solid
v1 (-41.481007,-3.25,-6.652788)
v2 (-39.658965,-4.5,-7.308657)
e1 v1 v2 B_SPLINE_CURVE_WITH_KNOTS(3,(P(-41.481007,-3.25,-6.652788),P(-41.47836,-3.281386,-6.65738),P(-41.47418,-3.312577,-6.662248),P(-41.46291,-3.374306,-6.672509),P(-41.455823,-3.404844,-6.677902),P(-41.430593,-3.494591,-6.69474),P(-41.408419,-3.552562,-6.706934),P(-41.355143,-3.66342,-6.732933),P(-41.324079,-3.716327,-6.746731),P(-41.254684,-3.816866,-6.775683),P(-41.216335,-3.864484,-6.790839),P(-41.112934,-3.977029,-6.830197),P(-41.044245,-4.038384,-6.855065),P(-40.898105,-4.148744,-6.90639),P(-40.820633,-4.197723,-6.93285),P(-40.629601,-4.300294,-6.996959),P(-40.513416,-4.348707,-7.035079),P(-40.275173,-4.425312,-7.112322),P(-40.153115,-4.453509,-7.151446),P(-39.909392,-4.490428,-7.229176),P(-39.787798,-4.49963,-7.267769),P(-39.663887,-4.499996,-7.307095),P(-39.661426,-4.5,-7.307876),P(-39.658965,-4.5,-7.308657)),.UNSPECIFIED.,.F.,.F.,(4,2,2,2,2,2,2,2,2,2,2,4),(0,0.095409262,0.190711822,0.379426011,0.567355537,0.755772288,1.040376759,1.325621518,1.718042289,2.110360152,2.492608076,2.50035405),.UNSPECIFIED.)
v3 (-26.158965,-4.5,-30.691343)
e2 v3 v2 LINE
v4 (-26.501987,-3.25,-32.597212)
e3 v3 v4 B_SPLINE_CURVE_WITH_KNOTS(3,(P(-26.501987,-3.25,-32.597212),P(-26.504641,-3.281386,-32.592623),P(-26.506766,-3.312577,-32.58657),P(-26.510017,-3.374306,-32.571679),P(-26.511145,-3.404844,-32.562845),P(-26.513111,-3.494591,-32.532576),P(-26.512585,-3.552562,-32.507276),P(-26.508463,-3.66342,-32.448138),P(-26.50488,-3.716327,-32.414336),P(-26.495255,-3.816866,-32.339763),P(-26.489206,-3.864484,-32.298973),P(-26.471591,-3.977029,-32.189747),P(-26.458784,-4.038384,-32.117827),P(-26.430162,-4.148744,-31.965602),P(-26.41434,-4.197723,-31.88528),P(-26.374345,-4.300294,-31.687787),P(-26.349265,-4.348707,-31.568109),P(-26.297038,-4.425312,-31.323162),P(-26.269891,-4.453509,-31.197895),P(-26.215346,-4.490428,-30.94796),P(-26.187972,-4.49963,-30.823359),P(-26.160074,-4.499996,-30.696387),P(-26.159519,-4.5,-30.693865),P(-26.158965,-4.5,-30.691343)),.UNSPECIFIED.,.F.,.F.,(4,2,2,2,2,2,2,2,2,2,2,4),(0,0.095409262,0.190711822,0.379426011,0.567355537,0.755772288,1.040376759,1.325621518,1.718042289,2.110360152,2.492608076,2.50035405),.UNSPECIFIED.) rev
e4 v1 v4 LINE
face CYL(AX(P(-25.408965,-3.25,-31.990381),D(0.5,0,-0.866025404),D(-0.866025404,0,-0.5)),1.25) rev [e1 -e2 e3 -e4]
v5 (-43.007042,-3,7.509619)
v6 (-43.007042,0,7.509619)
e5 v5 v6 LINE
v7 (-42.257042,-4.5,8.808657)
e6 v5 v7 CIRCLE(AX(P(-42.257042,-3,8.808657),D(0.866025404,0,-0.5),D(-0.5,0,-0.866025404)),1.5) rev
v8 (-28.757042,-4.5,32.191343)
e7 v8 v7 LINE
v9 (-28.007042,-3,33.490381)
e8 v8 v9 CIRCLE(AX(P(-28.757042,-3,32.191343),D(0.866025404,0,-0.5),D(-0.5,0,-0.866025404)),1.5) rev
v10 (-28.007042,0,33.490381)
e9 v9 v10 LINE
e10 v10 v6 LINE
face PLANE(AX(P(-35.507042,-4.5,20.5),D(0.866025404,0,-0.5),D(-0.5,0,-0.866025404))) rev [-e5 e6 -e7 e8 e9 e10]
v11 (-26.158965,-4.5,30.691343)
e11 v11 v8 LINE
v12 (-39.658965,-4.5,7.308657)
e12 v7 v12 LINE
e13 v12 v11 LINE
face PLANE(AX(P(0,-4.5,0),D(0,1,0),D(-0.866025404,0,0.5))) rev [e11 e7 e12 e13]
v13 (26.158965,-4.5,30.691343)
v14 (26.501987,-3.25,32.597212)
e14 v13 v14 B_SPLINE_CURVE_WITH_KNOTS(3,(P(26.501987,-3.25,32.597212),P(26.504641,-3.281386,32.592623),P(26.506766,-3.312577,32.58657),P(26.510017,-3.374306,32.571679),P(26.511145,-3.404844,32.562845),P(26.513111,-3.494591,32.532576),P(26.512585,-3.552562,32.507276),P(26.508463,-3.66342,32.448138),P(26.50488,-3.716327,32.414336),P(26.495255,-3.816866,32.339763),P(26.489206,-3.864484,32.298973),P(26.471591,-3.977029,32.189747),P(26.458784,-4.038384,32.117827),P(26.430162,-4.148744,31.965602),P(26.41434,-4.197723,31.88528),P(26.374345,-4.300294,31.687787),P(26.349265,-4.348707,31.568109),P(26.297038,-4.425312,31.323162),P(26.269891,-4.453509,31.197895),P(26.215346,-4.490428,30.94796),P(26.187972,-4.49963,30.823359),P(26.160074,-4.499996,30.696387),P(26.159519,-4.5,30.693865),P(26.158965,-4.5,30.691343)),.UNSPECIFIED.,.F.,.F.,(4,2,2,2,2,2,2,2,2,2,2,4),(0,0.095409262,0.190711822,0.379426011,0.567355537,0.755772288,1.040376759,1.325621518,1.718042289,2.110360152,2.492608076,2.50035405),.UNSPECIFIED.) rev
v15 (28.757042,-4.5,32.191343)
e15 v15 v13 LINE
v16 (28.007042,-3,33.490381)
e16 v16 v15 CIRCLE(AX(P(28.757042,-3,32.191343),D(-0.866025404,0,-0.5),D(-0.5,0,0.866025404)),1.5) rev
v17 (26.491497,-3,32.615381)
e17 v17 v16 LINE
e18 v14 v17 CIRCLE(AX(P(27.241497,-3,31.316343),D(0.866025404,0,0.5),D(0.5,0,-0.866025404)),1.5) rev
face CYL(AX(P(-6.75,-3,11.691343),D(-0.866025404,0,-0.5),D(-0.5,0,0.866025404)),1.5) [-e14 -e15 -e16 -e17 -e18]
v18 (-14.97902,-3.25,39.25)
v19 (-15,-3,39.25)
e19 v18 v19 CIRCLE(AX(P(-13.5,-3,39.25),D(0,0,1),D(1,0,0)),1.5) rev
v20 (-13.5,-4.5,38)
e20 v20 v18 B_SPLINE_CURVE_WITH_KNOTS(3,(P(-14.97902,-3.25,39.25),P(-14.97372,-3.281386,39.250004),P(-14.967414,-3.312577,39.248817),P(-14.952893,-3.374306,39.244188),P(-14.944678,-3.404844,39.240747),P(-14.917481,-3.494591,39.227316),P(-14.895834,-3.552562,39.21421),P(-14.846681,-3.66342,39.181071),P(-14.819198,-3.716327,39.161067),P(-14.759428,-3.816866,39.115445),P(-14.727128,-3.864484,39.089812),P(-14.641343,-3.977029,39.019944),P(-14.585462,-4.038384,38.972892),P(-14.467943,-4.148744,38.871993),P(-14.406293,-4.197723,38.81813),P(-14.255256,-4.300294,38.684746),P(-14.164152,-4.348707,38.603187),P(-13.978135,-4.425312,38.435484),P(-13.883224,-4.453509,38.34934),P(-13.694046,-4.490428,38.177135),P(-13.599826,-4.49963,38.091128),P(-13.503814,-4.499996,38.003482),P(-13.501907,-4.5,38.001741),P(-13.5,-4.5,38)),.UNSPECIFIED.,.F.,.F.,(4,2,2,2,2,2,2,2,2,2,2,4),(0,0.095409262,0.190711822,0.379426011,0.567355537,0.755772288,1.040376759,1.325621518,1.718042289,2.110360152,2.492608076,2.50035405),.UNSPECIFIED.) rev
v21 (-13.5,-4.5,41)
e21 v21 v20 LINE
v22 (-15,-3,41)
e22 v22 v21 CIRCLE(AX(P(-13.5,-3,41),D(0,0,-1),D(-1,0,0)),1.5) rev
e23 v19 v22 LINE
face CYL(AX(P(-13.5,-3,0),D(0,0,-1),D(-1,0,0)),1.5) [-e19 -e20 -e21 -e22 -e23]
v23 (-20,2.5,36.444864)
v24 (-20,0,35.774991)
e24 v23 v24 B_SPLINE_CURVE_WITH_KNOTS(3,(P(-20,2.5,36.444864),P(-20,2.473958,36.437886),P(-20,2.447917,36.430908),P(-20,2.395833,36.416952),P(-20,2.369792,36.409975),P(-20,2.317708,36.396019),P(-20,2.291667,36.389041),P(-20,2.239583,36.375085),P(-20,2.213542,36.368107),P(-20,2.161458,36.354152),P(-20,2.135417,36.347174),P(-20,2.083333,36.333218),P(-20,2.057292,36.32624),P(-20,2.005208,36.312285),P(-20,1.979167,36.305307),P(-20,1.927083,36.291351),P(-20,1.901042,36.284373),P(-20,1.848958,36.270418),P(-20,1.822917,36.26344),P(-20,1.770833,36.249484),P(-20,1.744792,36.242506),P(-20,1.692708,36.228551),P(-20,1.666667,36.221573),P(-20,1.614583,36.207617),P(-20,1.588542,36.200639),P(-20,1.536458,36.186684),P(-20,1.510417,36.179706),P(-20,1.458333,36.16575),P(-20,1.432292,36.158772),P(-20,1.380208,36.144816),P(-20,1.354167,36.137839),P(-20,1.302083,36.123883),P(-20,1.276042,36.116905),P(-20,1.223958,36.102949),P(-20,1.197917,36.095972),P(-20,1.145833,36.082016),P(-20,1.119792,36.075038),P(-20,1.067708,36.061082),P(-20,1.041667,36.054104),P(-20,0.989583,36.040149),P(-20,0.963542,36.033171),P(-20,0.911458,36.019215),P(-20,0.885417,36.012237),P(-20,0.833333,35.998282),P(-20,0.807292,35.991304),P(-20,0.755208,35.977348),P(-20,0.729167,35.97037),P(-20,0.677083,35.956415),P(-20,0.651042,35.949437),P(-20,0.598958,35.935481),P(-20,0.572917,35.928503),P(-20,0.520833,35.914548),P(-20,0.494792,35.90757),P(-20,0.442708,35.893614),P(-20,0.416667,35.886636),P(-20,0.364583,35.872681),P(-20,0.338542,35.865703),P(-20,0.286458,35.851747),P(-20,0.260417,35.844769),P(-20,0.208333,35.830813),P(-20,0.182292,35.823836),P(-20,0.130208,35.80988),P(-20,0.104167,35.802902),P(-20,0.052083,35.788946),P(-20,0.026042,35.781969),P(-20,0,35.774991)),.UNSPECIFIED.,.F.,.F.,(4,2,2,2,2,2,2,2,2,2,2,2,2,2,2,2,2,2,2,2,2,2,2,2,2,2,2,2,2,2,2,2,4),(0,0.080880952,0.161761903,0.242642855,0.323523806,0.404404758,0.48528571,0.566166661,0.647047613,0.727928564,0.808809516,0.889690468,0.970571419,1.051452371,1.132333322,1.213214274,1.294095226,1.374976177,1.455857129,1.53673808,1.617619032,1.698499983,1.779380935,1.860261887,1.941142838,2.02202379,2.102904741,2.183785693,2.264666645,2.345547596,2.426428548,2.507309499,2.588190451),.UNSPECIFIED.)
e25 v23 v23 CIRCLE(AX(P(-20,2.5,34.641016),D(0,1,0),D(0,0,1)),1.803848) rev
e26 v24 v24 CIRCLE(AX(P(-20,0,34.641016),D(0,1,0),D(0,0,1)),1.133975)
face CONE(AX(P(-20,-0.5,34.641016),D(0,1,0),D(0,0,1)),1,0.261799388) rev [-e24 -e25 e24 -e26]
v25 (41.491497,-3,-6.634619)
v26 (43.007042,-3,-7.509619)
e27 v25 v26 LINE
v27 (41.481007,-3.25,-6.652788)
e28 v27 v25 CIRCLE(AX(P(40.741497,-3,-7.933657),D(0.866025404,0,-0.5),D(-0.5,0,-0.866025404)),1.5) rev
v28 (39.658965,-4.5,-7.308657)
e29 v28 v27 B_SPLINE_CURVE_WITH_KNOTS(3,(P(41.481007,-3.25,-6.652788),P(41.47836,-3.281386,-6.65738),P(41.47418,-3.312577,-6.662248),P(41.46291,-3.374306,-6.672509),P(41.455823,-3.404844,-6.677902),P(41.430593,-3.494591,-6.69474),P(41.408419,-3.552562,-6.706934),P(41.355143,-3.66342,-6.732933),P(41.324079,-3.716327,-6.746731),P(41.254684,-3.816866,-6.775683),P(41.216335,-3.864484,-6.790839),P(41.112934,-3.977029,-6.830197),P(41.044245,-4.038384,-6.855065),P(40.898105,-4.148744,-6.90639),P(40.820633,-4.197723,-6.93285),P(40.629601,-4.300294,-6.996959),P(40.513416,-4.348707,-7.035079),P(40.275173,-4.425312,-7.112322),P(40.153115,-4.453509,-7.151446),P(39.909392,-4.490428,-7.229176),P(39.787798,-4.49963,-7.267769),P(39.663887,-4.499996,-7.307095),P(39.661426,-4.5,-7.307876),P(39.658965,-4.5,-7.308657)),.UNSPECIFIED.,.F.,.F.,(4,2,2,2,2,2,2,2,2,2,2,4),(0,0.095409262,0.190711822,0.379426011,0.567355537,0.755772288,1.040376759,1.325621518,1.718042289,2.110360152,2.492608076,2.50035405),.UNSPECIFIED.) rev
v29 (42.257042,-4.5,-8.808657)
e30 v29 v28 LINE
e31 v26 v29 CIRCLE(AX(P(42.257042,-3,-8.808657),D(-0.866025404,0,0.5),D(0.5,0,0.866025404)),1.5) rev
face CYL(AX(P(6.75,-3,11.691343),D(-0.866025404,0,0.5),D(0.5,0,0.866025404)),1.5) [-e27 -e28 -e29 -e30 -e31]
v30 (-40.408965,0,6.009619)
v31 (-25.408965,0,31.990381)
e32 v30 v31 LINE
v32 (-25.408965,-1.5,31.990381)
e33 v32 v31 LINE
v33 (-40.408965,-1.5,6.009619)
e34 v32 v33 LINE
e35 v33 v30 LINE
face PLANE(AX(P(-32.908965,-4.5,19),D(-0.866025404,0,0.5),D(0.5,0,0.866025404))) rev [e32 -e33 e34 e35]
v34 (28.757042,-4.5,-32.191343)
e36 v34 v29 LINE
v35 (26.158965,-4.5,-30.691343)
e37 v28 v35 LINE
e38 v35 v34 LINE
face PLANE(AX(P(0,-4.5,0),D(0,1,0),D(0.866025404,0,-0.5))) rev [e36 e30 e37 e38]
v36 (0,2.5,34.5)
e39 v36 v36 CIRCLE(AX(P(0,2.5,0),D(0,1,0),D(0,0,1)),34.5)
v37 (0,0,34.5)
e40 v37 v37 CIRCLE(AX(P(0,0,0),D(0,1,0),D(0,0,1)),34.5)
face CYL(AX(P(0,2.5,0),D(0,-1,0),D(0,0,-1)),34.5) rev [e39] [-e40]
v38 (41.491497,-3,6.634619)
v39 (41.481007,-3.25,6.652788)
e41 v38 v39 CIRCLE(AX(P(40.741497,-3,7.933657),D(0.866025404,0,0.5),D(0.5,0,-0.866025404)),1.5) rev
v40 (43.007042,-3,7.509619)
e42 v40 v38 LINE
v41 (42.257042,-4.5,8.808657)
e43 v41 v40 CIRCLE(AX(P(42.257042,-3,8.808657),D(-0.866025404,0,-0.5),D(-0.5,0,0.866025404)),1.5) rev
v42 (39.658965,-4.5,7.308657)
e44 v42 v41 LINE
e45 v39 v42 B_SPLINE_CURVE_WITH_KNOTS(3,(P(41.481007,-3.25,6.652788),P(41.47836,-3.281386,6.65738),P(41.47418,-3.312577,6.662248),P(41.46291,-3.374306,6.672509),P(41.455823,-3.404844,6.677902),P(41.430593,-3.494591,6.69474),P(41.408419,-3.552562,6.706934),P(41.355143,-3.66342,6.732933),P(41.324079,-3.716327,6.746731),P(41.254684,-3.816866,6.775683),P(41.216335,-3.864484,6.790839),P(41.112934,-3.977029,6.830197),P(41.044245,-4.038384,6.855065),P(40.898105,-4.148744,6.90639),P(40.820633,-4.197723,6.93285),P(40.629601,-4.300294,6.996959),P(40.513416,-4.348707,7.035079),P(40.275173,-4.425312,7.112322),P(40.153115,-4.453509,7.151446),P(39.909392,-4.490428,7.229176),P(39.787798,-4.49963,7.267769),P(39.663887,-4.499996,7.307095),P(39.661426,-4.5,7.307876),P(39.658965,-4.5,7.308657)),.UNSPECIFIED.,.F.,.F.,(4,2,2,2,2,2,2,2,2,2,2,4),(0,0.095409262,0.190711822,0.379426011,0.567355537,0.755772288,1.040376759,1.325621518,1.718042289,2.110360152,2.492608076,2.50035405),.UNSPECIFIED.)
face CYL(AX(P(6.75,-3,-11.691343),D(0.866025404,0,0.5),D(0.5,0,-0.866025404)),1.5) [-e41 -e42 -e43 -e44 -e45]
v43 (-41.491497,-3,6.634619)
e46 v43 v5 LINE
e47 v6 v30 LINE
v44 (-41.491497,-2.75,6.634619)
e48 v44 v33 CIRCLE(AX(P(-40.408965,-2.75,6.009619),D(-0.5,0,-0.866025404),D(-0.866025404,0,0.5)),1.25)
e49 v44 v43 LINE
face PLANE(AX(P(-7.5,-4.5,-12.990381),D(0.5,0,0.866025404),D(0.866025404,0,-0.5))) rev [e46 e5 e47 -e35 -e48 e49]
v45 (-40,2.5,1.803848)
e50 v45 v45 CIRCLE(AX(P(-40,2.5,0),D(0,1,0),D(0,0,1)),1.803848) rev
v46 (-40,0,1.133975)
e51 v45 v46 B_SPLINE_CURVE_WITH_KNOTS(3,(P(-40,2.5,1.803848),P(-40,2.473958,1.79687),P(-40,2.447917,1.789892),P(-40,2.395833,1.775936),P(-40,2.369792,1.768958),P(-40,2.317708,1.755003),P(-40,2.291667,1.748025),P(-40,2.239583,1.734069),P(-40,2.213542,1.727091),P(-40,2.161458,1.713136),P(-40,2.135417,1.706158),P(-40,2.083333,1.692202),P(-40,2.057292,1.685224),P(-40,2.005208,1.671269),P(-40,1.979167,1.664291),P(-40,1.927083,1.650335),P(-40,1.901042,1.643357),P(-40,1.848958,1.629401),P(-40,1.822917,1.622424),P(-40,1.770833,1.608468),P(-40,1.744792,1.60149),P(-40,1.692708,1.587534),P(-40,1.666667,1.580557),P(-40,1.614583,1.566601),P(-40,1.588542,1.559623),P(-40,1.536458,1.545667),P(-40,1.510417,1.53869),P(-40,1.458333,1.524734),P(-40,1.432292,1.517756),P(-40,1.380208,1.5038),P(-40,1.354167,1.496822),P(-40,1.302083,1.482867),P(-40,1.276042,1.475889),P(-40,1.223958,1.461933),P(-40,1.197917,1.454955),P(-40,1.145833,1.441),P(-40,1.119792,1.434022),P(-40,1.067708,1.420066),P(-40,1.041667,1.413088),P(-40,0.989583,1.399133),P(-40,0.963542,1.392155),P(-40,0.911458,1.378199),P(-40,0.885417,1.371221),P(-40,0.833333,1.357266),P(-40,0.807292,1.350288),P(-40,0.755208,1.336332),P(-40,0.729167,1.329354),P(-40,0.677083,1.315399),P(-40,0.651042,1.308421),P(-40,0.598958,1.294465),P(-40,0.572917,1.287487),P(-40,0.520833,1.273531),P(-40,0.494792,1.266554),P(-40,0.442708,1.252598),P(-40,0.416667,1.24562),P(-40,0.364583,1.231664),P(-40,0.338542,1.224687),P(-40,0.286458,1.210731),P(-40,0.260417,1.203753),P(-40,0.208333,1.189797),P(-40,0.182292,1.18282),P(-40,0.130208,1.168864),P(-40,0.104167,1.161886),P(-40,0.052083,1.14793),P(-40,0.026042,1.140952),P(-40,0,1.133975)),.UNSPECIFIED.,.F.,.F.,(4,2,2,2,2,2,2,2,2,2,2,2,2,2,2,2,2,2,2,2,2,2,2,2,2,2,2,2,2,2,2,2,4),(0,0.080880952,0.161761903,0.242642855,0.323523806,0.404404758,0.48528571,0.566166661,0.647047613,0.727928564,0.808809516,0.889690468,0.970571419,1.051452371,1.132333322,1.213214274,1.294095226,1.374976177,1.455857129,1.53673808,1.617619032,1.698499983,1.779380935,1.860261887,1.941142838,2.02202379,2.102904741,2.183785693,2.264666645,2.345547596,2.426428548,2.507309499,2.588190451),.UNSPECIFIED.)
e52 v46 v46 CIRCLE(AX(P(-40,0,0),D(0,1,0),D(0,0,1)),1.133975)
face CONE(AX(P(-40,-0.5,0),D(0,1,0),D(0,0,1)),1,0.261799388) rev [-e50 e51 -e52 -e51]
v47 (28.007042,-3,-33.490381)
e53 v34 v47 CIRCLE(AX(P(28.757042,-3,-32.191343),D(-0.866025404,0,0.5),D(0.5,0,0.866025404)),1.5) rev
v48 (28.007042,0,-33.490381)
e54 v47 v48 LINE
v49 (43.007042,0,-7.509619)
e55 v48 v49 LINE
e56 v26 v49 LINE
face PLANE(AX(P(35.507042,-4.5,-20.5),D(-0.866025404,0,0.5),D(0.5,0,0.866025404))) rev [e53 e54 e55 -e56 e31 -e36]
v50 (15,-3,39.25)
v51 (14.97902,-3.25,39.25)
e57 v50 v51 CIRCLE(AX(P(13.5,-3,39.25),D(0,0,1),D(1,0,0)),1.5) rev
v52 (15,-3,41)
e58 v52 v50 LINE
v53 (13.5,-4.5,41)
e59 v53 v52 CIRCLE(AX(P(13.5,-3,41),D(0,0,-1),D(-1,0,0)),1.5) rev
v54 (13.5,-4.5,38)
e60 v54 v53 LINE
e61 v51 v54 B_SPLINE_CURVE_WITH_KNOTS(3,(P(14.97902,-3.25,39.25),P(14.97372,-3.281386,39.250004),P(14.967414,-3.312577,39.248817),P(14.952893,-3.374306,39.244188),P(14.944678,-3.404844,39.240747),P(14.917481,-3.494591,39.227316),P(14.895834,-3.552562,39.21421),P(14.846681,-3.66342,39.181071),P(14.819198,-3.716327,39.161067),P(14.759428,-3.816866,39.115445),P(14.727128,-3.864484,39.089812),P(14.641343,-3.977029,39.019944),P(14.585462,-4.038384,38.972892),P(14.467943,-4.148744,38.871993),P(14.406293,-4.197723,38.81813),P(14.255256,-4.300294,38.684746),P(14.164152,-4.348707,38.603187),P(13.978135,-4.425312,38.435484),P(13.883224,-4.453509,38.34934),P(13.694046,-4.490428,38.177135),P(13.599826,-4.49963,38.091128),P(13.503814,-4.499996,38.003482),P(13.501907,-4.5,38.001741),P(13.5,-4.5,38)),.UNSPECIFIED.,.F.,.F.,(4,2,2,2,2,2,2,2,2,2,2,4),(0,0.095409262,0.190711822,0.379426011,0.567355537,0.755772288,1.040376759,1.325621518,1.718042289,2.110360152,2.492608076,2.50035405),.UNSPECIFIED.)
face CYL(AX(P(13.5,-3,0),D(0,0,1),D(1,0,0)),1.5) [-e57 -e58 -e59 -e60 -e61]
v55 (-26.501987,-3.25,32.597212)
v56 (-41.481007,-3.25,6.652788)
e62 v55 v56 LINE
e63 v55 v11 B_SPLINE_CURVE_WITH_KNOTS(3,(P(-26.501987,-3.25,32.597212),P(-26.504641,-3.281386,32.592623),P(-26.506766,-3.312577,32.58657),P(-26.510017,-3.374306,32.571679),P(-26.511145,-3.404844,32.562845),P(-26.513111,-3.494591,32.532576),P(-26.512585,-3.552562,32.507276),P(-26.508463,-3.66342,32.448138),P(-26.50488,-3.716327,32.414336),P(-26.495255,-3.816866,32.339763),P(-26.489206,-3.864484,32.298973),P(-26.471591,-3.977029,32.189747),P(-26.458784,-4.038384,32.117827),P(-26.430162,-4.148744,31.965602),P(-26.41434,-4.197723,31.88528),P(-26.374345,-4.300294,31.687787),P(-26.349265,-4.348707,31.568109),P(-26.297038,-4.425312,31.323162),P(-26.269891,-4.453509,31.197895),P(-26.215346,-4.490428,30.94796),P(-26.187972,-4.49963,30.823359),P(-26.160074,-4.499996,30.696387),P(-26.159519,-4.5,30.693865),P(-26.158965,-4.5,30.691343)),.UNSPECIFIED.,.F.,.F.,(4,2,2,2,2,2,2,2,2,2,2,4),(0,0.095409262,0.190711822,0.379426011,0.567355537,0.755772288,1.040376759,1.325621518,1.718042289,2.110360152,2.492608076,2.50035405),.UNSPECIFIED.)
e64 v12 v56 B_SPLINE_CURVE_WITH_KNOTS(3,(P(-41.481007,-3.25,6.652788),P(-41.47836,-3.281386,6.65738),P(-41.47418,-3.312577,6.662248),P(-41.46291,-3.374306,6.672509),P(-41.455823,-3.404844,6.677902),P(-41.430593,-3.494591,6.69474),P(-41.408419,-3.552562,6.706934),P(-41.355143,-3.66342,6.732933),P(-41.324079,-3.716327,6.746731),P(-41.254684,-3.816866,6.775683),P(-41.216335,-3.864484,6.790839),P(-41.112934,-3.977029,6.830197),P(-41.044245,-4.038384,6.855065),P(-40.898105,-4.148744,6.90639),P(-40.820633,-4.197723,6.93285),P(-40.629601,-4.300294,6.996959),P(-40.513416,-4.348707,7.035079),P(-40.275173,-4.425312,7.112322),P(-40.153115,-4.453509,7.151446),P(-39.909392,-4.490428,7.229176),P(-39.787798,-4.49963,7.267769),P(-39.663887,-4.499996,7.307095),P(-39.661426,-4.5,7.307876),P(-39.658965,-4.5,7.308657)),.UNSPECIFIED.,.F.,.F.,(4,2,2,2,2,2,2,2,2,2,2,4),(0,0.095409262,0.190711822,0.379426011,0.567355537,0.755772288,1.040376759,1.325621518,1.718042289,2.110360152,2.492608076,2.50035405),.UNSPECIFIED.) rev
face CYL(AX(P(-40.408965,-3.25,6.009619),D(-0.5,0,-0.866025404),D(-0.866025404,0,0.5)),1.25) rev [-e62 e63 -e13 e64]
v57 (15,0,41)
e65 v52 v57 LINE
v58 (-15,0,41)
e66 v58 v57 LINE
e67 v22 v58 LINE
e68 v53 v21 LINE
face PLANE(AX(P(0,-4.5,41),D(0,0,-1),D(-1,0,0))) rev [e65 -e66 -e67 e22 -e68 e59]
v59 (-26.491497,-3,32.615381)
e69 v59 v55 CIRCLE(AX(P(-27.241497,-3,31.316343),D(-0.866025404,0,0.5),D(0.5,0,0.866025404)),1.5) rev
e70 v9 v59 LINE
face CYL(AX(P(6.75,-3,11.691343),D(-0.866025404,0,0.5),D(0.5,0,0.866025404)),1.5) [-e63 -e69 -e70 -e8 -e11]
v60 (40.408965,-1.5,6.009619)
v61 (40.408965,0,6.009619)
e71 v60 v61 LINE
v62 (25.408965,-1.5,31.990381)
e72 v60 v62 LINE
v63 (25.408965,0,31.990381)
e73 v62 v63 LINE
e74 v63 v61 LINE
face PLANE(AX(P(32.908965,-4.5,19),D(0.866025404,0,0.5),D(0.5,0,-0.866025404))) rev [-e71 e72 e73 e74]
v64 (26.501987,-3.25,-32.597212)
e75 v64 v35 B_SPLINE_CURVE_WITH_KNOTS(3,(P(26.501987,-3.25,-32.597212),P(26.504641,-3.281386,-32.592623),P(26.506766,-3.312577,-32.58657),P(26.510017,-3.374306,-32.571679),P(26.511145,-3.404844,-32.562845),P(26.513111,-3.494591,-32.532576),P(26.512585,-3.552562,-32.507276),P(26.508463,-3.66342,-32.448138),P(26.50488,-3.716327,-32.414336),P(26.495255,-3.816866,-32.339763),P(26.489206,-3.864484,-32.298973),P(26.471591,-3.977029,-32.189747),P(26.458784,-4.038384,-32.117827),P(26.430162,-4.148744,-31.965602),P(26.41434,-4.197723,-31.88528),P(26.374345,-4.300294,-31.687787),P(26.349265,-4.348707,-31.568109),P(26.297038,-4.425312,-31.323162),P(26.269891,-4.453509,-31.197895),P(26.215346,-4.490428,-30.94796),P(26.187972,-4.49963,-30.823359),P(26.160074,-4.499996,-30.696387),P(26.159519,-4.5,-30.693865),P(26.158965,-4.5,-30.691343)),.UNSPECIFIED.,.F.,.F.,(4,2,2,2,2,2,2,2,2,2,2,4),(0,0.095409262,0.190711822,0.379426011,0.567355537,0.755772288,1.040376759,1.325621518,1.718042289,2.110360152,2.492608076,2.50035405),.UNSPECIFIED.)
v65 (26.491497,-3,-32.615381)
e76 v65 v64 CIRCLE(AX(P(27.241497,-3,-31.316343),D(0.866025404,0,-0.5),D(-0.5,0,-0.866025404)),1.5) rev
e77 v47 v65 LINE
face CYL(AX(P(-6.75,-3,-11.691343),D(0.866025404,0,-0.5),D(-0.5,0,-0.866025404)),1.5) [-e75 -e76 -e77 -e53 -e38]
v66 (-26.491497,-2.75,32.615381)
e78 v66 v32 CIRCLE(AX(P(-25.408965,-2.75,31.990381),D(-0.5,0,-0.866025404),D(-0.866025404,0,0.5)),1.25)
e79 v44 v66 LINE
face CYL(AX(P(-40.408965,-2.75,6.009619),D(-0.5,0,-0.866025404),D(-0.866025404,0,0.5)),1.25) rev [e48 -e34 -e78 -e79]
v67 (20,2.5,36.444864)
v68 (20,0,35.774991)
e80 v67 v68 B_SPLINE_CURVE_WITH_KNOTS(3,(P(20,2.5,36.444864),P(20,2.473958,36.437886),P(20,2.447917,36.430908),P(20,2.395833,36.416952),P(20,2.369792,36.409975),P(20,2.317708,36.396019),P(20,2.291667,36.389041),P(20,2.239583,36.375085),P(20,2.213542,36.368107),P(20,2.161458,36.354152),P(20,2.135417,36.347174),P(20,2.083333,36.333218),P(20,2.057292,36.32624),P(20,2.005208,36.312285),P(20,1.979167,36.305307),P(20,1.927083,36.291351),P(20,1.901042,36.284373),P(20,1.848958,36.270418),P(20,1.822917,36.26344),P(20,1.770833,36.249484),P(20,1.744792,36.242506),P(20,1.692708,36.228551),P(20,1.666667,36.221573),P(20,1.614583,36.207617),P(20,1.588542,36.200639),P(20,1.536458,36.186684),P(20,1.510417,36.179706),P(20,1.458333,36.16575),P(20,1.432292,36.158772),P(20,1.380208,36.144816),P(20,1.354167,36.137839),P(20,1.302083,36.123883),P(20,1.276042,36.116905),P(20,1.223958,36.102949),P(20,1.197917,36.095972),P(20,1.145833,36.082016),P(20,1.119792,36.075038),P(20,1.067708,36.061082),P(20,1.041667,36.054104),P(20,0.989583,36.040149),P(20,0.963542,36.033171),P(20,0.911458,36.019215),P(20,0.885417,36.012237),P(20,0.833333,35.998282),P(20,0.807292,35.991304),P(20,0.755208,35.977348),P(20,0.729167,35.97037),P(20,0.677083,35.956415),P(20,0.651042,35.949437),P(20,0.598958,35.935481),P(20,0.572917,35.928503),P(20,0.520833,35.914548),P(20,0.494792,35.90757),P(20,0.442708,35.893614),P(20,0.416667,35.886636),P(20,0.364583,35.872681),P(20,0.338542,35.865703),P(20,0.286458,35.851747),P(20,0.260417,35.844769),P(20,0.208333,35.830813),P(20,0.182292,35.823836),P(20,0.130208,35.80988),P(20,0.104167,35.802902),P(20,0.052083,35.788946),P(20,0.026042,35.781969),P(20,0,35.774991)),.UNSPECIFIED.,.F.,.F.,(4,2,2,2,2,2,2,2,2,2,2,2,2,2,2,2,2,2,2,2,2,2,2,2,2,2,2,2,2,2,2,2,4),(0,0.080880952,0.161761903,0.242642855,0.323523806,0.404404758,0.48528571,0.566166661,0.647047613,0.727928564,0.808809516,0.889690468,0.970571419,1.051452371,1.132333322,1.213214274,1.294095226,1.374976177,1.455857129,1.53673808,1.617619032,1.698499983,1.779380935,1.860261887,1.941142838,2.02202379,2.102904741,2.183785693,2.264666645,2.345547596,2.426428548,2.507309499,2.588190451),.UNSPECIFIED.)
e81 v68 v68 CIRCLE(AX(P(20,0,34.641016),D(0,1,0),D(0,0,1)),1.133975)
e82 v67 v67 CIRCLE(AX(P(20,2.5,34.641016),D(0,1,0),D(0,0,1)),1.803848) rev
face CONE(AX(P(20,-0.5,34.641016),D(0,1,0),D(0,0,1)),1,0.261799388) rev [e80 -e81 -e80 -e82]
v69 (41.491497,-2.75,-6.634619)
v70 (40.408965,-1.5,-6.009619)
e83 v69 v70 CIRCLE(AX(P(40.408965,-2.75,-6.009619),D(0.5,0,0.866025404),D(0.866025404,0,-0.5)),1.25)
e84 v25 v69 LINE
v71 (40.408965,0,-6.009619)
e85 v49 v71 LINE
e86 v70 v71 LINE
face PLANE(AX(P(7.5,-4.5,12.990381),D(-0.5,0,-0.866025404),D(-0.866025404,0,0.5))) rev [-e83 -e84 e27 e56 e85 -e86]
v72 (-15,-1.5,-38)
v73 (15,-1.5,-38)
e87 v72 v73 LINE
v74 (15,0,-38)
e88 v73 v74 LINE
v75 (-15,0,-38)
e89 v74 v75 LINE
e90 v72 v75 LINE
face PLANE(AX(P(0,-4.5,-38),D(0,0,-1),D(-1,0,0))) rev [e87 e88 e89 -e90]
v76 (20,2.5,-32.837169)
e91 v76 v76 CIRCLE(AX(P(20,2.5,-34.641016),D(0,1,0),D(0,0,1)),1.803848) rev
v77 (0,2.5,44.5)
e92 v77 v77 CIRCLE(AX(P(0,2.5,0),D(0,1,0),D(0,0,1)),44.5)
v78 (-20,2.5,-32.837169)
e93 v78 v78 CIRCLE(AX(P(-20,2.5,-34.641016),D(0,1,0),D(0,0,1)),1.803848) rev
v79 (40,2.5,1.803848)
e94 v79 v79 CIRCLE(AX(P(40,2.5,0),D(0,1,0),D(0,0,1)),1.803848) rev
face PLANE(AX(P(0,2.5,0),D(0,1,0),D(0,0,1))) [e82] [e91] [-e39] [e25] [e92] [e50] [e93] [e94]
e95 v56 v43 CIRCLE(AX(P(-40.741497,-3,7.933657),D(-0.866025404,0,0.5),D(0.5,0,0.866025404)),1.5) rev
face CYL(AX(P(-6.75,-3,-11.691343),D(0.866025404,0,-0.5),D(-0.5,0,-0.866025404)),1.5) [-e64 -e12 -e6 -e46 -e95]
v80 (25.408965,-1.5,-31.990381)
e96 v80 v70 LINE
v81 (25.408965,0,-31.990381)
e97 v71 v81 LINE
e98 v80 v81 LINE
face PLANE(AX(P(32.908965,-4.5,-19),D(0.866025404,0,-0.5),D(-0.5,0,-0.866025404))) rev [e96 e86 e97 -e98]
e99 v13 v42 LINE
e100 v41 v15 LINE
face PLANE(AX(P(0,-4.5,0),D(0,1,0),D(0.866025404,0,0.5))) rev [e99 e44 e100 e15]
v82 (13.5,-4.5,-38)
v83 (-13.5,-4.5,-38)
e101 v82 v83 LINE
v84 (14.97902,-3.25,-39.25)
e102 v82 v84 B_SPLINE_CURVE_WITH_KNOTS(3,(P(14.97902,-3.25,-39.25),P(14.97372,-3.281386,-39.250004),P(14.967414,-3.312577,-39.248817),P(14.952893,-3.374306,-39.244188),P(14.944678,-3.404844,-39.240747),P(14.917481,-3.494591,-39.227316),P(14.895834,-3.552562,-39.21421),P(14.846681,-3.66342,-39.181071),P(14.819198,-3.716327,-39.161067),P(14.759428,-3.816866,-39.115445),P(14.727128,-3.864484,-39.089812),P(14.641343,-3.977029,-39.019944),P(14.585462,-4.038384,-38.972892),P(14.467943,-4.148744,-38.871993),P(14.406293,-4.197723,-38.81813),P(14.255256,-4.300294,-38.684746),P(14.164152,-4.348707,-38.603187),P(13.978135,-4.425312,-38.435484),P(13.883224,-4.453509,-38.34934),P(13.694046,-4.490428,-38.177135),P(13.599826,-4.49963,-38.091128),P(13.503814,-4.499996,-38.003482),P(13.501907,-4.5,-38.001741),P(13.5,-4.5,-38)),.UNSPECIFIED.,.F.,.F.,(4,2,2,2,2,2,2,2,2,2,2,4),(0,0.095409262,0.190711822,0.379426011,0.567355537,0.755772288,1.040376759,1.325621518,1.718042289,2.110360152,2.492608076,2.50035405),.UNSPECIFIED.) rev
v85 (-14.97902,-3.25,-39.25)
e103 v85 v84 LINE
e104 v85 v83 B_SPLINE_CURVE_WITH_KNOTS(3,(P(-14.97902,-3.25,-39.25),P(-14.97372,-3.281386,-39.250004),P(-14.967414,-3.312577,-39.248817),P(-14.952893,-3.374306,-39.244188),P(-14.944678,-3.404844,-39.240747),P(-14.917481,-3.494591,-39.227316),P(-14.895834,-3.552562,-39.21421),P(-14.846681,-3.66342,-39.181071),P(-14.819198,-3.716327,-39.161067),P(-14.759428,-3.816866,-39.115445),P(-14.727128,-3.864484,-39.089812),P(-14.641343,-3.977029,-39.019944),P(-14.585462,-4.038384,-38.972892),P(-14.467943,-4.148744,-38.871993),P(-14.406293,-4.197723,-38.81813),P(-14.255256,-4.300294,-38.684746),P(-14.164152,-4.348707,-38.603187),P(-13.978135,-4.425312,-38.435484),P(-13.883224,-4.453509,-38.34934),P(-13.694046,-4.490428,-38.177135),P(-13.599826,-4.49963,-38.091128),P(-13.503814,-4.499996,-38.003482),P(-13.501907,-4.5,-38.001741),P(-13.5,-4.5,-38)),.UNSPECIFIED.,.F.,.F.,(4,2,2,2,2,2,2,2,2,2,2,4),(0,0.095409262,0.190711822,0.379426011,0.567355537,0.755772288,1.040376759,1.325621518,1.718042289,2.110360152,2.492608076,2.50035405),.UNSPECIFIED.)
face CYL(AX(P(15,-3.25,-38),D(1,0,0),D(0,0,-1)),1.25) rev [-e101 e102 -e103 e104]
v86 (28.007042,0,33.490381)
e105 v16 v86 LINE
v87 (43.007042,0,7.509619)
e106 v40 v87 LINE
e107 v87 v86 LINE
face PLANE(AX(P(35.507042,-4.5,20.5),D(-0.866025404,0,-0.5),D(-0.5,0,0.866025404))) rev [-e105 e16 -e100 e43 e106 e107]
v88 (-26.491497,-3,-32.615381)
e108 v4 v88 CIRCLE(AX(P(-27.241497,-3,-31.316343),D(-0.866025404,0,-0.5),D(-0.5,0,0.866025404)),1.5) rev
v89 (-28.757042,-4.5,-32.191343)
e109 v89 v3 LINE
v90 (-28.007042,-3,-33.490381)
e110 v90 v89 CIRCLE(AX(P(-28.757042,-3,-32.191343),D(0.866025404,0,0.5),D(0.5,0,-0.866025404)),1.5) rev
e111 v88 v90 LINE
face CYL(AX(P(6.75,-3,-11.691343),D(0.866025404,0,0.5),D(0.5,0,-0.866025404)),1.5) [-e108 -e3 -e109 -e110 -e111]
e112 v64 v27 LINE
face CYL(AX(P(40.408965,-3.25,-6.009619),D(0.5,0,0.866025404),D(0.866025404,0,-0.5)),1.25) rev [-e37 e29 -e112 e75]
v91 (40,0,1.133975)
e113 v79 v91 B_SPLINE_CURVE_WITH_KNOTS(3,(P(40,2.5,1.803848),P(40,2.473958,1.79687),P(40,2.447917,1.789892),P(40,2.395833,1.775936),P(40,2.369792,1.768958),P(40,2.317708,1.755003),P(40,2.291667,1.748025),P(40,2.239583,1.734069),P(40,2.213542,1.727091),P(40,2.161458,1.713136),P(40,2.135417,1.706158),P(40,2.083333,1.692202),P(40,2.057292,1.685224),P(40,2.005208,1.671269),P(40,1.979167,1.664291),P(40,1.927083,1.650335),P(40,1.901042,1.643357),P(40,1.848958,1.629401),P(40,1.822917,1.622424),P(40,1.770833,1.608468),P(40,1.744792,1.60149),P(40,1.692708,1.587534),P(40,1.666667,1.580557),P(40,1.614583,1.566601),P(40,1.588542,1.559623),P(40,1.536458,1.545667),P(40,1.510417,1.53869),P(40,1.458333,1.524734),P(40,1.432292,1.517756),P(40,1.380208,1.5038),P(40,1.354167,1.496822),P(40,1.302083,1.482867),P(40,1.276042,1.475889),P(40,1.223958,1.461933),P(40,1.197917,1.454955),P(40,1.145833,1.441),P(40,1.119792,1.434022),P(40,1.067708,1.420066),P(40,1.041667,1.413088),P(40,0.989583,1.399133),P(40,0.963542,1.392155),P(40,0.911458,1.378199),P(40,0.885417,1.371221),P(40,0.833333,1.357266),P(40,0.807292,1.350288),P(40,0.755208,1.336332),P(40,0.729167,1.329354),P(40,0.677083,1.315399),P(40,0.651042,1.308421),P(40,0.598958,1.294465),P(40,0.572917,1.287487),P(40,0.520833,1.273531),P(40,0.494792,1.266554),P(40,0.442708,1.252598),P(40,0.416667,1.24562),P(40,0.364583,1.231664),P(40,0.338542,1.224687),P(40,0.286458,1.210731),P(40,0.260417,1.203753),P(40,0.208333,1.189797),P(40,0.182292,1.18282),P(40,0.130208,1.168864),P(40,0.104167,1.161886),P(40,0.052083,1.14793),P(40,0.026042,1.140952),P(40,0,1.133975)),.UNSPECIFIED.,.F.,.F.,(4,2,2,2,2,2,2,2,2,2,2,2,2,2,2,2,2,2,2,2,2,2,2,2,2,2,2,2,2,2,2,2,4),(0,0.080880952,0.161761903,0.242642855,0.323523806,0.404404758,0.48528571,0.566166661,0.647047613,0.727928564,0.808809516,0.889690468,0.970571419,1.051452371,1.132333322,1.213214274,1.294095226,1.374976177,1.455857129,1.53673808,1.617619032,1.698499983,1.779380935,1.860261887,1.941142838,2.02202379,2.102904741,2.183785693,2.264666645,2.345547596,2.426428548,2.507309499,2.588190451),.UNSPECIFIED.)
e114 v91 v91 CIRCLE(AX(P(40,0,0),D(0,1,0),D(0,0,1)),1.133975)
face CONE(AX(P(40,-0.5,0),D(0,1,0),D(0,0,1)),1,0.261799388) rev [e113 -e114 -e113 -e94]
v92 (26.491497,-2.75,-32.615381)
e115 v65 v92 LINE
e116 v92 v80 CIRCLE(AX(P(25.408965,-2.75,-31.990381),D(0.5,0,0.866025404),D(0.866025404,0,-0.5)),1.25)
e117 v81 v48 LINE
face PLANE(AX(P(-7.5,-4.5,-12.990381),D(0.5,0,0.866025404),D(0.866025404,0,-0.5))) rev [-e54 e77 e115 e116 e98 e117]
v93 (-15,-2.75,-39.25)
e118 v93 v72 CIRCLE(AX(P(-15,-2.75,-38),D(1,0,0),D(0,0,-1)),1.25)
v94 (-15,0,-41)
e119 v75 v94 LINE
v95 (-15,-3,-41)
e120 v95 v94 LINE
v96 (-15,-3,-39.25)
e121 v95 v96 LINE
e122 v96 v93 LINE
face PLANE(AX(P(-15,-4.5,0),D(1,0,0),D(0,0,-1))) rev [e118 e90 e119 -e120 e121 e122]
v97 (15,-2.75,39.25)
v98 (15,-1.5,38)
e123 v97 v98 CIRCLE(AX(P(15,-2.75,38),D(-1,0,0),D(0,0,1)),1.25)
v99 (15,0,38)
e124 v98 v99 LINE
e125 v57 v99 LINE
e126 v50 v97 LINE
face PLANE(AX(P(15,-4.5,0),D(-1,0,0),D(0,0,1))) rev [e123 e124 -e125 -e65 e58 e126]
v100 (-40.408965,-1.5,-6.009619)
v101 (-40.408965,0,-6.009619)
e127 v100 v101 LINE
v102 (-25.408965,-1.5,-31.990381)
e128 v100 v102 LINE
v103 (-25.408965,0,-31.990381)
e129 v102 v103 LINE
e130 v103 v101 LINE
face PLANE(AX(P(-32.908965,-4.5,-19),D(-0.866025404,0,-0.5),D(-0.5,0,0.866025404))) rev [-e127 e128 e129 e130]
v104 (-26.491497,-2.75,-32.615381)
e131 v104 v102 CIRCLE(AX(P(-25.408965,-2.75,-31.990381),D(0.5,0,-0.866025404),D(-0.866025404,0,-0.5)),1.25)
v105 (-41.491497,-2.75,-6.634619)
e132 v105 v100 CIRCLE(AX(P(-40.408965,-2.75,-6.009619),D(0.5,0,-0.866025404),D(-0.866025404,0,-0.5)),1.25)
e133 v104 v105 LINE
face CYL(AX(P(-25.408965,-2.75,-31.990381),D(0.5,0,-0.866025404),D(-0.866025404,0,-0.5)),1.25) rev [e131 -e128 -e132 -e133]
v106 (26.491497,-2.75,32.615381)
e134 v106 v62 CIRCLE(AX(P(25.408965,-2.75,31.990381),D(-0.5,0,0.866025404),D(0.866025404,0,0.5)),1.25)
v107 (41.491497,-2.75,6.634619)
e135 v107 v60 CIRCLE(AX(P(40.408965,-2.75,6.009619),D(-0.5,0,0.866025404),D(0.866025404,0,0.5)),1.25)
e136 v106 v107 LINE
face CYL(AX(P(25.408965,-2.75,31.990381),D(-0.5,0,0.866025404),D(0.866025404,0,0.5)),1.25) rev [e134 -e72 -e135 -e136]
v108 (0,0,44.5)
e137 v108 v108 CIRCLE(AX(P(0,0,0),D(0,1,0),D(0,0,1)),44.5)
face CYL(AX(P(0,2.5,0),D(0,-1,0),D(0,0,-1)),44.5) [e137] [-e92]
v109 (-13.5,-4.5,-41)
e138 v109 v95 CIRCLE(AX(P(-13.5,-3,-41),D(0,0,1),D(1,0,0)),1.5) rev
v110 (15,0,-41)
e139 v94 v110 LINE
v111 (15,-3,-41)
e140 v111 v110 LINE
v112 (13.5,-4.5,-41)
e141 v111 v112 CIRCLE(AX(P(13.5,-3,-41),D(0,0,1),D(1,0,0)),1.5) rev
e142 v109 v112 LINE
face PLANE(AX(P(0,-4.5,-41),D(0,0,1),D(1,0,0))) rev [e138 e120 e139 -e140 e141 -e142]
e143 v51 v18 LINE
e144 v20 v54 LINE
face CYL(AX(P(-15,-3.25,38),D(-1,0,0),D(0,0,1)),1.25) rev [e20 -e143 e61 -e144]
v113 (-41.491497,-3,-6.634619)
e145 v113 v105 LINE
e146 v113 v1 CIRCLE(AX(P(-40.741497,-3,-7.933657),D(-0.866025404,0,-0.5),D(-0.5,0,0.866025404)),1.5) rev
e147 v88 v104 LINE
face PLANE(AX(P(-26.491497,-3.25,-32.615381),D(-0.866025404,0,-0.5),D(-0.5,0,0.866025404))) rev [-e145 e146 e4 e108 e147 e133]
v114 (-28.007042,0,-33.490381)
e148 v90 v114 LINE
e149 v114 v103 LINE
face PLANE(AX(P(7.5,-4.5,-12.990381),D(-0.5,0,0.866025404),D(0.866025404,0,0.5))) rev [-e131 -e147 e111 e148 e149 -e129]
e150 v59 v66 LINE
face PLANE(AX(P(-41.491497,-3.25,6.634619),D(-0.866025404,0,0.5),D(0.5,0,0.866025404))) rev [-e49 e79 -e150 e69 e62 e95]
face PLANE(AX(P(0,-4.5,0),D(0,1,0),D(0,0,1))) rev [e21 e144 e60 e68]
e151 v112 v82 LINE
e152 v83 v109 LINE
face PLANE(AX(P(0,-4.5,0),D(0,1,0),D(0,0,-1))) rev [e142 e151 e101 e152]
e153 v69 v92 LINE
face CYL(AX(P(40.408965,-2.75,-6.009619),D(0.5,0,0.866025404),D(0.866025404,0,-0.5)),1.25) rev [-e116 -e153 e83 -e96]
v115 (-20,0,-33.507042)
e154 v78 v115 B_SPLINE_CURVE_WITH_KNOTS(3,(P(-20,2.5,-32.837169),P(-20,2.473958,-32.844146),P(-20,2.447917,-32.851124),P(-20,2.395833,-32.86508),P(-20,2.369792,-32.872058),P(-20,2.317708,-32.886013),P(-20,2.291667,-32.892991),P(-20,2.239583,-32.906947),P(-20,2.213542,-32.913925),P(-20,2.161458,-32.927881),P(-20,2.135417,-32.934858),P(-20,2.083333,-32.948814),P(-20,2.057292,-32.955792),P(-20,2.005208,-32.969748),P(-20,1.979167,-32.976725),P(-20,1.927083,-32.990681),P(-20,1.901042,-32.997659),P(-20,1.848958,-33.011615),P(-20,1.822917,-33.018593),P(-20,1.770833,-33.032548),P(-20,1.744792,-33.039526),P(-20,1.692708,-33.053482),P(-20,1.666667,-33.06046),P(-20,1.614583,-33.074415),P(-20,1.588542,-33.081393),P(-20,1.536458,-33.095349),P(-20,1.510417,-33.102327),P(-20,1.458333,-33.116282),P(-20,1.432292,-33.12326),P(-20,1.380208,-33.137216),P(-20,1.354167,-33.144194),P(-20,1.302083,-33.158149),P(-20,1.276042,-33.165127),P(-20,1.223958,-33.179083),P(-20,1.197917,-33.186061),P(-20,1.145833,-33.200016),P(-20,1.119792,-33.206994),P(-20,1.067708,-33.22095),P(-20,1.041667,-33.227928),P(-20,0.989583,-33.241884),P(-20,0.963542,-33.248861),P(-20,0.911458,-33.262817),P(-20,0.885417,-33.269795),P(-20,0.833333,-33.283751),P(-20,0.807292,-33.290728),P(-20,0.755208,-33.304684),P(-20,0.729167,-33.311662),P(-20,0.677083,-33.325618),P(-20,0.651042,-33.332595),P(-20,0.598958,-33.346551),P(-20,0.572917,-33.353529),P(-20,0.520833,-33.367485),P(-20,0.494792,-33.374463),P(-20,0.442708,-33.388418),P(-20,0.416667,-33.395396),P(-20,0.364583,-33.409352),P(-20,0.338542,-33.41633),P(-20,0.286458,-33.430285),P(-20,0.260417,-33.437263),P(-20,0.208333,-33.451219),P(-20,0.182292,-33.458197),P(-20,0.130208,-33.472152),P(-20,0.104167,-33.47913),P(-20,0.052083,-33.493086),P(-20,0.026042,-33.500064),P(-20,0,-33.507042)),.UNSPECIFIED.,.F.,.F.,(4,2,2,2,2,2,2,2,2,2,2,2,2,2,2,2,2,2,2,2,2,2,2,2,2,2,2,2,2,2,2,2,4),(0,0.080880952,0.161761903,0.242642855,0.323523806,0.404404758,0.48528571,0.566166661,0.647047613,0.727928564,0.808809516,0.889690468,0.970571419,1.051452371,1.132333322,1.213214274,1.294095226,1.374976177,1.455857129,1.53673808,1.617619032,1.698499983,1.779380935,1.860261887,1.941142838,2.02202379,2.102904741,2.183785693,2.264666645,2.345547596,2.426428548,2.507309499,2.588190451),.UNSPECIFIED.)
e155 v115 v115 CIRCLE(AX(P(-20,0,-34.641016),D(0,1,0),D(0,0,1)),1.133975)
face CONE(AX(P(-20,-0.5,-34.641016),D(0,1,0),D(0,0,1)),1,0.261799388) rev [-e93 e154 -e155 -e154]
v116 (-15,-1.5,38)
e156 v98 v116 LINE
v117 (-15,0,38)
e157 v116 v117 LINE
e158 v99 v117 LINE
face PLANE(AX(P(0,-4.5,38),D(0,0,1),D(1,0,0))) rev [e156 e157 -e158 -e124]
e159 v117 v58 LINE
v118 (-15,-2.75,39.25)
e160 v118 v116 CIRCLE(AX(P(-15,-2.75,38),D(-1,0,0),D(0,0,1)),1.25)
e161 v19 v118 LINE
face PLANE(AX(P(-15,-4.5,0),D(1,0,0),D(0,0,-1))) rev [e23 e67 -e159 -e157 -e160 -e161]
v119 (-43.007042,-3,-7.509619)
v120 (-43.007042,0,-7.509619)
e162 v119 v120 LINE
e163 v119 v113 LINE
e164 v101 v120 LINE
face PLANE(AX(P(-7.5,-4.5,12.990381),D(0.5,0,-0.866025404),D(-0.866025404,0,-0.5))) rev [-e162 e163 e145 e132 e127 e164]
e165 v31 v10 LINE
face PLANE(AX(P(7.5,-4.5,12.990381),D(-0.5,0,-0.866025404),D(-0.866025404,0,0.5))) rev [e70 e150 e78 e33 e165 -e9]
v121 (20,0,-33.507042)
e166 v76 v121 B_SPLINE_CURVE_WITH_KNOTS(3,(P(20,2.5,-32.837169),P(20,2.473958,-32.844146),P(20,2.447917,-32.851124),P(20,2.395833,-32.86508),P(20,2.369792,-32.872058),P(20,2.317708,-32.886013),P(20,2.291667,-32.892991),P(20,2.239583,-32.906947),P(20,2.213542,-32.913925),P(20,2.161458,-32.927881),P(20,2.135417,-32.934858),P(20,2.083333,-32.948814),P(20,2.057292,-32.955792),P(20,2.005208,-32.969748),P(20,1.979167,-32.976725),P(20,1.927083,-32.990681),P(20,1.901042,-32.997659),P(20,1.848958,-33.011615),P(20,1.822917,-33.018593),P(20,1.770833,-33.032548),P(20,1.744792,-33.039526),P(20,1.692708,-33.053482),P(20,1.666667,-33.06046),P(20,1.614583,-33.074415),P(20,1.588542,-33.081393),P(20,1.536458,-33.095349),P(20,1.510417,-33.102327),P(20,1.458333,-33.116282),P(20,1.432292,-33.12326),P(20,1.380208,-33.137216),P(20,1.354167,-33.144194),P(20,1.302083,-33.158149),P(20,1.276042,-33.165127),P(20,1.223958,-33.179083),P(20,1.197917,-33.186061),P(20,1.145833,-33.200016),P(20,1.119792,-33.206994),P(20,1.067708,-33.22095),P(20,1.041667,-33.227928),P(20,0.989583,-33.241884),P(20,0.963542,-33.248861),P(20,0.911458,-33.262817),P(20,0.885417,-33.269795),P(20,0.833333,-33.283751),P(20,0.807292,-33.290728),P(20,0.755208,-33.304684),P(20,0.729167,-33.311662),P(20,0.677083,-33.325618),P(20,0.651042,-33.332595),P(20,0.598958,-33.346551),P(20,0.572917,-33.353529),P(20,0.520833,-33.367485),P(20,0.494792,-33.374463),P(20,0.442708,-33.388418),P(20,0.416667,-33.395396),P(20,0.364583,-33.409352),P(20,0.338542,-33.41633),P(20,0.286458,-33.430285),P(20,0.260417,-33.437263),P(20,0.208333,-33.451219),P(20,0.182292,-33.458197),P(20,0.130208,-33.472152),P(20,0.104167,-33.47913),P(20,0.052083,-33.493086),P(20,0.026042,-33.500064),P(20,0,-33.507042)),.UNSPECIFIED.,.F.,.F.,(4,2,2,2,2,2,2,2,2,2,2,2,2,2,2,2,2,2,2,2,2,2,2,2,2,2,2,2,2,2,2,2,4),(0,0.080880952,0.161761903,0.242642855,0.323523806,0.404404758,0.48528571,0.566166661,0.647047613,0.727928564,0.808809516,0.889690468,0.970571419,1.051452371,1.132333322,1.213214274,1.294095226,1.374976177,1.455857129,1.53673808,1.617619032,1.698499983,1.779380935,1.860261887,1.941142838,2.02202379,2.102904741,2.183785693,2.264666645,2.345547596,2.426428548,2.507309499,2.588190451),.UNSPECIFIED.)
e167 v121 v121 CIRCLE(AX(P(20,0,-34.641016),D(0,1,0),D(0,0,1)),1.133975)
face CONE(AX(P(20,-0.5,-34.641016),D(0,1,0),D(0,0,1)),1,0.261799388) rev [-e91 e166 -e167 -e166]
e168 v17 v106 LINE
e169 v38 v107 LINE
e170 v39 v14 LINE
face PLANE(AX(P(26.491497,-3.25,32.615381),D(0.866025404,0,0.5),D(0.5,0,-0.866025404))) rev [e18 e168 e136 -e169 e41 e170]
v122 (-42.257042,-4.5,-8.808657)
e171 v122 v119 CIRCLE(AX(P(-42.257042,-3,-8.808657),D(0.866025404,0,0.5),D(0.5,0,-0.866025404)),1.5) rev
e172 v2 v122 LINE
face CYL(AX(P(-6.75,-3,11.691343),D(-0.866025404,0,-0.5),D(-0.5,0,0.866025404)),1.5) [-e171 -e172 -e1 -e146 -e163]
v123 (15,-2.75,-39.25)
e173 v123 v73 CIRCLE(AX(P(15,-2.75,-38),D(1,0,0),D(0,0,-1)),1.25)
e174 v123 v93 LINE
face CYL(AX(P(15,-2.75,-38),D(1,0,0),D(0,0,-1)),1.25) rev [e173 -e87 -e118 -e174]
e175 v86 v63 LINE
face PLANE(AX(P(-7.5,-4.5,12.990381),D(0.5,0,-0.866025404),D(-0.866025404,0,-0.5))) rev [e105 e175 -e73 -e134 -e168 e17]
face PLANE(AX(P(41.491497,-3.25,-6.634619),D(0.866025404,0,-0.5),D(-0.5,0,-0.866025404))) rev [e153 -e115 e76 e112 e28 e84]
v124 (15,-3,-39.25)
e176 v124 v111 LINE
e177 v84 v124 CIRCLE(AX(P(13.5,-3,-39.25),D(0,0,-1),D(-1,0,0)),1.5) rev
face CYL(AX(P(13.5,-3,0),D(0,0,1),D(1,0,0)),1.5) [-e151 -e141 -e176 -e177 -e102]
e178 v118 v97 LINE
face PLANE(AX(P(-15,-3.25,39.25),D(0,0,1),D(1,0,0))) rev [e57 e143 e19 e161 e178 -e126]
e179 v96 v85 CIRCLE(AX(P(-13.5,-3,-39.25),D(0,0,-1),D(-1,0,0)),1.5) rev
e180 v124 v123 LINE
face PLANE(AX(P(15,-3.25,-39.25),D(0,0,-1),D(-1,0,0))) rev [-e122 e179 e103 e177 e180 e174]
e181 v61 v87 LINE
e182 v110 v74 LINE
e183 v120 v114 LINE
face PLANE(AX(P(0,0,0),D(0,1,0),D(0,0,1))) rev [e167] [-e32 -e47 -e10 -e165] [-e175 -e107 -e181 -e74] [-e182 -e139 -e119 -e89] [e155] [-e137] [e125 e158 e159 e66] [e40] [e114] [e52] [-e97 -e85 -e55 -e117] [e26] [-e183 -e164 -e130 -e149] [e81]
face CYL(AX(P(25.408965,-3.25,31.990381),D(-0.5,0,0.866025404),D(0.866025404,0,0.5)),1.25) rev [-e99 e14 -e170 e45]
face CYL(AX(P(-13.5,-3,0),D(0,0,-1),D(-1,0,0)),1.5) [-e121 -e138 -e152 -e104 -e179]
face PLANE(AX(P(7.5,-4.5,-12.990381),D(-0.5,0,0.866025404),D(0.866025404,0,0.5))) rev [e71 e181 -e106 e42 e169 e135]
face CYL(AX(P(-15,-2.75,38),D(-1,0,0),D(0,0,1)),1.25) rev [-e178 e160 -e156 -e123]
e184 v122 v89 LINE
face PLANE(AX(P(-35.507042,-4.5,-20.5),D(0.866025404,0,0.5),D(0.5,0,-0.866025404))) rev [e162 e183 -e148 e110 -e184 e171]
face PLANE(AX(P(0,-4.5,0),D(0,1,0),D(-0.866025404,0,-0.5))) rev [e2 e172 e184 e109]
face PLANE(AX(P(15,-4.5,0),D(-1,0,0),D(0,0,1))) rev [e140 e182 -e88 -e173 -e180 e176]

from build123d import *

# Parameters (mm, degrees)
BOSS_EXTRUDE2_START       = -4.5
SKETCH1_W                 = 30
SKETCH1_H                 = 3
BOSS_EXTRUDE2_DEPTH       = 5.5
SKETCH3_R                 = 44.5
SKETCH3_R_2               = 34.5
SKETCH3_R_3               = 1
BOSS_EXTRUDE3_DEPTH       = 2.5
CHAMFER1_SIZE             = 3
CHAMFER1_SIZE_2           = 0.803847577
FILLET1_R                 = 1.5
F_1_0MM_START             = -15
F_1_0MM_DOWEL_SLOT1_DEPTH = 30
CIRPATTERN1_COUNT         = 6
FILLET1_OF_CIRPATTERN1_R  = 1.5


# Read off the part's stored shape, not the designer's step: Ø1.0mm Dowel Slot1
with BuildPart() as part:
    # Sketch1 → Boss-Extrude2 (new body)
    with BuildSketch(Plane(origin=(0, 0, 0), x_dir=(1, 0, 0), z_dir=(0, 1, 0)).offset(BOSS_EXTRUDE2_START)):
        with Locations((0, -39.5)):
            Rectangle(SKETCH1_W, SKETCH1_H)
    boss_extrude2 = extrude(amount=BOSS_EXTRUDE2_DEPTH)

    # Sketch3 → Boss-Extrude3 (add)
    with BuildSketch(Plane(origin=(0, 0, 0), x_dir=(1, 0, 0), z_dir=(0, 1, 0))):
        with Locations(Location((0, 0, 0), (0, 0, 270))):
            Circle(SKETCH3_R)
        with Locations(Location((0, 0, 0), (0, 0, 270))):
            Circle(SKETCH3_R_2, mode=Mode.SUBTRACT)
        with Locations(Location((-20, 34.641016151, 0), (0, 0, 270))):
            Circle(SKETCH3_R_3, mode=Mode.SUBTRACT)
        with Locations(Location((20, 34.641016151, 0), (0, 0, 270))):
            Circle(SKETCH3_R_3, mode=Mode.SUBTRACT)
        with Locations(Location((40, 0, 0), (0, 0, 270))):
            Circle(SKETCH3_R_3, mode=Mode.SUBTRACT)
        with Locations(Location((20, -34.641016151, 0), (0, 0, 270))):
            Circle(SKETCH3_R_3, mode=Mode.SUBTRACT)
        with Locations(Location((-20, -34.641016151, 0), (0, 0, 270))):
            Circle(SKETCH3_R_3, mode=Mode.SUBTRACT)
        with Locations(Location((-40, 0, 0), (0, 0, 270))):
            Circle(SKETCH3_R_3, mode=Mode.SUBTRACT)
    extrude(amount=BOSS_EXTRUDE3_DEPTH)

    # Chamfer1
    # the kernel refuses this chamfer: 3, 0.803847577 mm, written as the material it takes off along each edge
    with BuildSketch(Plane(origin=(20, 2.5, 34.641016151), x_dir=(0, 0, 1), z_dir=(-1, 0, 0))) as chamfer1_piece_1:
        Polygon((1, -CHAMFER1_SIZE), (1 + CHAMFER1_SIZE_2, 0), (1, 0), align=None)
    revolve(axis=Axis((20, 2.5, 34.641016151), (0, 1, 0)), mode=Mode.SUBTRACT)
    with BuildSketch(Plane(origin=(40, 2.5, 0), x_dir=(0, 0, 1), z_dir=(-1, 0, 0))) as chamfer1_piece_2:
        Polygon((1, -CHAMFER1_SIZE), (1 + CHAMFER1_SIZE_2, 0), (1, 0), align=None)
    revolve(axis=Axis((40, 2.5, 0), (0, 1, 0)), mode=Mode.SUBTRACT)
    with BuildSketch(Plane(origin=(20, 2.5, -34.641016151), x_dir=(0, 0, 1), z_dir=(-1, 0, 0))) as chamfer1_piece_3:
        Polygon((1, -CHAMFER1_SIZE), (1 + CHAMFER1_SIZE_2, 0), (1, 0), align=None)
    revolve(axis=Axis((20, 2.5, -34.641016151), (0, 1, 0)), mode=Mode.SUBTRACT)
    with BuildSketch(Plane(origin=(-20, 2.5, -34.641016151), x_dir=(0, 0, 1), z_dir=(-1, 0, 0))) as chamfer1_piece_4:
        Polygon((1, -CHAMFER1_SIZE), (1 + CHAMFER1_SIZE_2, 0), (1, 0), align=None)
    revolve(axis=Axis((-20, 2.5, -34.641016151), (0, 1, 0)), mode=Mode.SUBTRACT)
    with BuildSketch(Plane(origin=(-40, 2.5, 0), x_dir=(0, 0, 1), z_dir=(-1, 0, 0))) as chamfer1_piece_5:
        Polygon((1, -CHAMFER1_SIZE), (1 + CHAMFER1_SIZE_2, 0), (1, 0), align=None)
    revolve(axis=Axis((-40, 2.5, 0), (0, 1, 0)), mode=Mode.SUBTRACT)
    with BuildSketch(Plane(origin=(-20, 2.5, 34.641016151), x_dir=(0, 0, 1), z_dir=(-1, 0, 0))) as chamfer1_piece_6:
        Polygon((1, -CHAMFER1_SIZE), (1 + CHAMFER1_SIZE_2, 0), (1, 0), align=None)
    revolve(axis=Axis((-20, 2.5, 34.641016151), (0, 1, 0)), mode=Mode.SUBTRACT)

    # Fillet1
    fillet1_edges = [part.edges().sort_by_distance(p)[0] for p in [
        (-15, -4.5, 39.5),
        (15, -4.5, 39.5),
    ]]
    fillet(fillet1_edges, radius=FILLET1_R)

    # Ø1.0mm Dowel Slot1 outline → Ø1.0mm Dowel Slot1 (cut)
    with BuildSketch(Plane.YZ.offset(F_1_0MM_START)):
        with BuildLine():
            ThreePointArc((-1.5, 38), (-1.866116524, 38.883883476), (-2.75, 39.25))
            Line((-2.75, 39.25), (-3.25, 39.25))
            ThreePointArc((-3.25, 39.25), (-4.133883476, 38.883883476), (-4.5, 38))
            Line((-4.5, 38), (-1.5, 38))
        make_face()
    f_1_0mm_dowel_slot1 = extrude(amount=F_1_0MM_DOWEL_SLOT1_DEPTH, mode=Mode.SUBTRACT)

    # CirPattern1: Boss-Extrude2, Ø1.0mm Dowel Slot1 ×6 about axis
    cirpattern1_axis = Axis((0, 0, 0), (0, 1, 0))
    add([boss_extrude2.rotate(cirpattern1_axis, i * 360 / CIRPATTERN1_COUNT) for i in range(1, CIRPATTERN1_COUNT)])
    add([f_1_0mm_dowel_slot1.rotate(cirpattern1_axis, i * 360 / CIRPATTERN1_COUNT) for i in range(1, CIRPATTERN1_COUNT)], mode=Mode.SUBTRACT)

    # Fillet1 of CirPattern1
    fillet1_of_cirpattern1_edges = [part.edges().sort_by_distance(p)[0] for p in [
        (26.708003449, -4.5, 32.740381057),
        (41.708003449, -4.5, 6.759618943),
        (41.708003449, -4.5, -6.759618943),
        (26.708003449, -4.5, -32.740381057),
        (15, -4.5, -39.5),
        (-15, -4.5, -39.5),
        (-26.708003449, -4.5, -32.740381057),
        (-41.708003449, -4.5, -6.759618943),
        (-41.708003449, -4.5, 6.759618943),
        (-26.708003449, -4.5, 32.740381057),
    ]]
    fillet(fillet1_of_cirpattern1_edges, radius=FILLET1_OF_CIRPATTERN1_R)


solid = part.part
